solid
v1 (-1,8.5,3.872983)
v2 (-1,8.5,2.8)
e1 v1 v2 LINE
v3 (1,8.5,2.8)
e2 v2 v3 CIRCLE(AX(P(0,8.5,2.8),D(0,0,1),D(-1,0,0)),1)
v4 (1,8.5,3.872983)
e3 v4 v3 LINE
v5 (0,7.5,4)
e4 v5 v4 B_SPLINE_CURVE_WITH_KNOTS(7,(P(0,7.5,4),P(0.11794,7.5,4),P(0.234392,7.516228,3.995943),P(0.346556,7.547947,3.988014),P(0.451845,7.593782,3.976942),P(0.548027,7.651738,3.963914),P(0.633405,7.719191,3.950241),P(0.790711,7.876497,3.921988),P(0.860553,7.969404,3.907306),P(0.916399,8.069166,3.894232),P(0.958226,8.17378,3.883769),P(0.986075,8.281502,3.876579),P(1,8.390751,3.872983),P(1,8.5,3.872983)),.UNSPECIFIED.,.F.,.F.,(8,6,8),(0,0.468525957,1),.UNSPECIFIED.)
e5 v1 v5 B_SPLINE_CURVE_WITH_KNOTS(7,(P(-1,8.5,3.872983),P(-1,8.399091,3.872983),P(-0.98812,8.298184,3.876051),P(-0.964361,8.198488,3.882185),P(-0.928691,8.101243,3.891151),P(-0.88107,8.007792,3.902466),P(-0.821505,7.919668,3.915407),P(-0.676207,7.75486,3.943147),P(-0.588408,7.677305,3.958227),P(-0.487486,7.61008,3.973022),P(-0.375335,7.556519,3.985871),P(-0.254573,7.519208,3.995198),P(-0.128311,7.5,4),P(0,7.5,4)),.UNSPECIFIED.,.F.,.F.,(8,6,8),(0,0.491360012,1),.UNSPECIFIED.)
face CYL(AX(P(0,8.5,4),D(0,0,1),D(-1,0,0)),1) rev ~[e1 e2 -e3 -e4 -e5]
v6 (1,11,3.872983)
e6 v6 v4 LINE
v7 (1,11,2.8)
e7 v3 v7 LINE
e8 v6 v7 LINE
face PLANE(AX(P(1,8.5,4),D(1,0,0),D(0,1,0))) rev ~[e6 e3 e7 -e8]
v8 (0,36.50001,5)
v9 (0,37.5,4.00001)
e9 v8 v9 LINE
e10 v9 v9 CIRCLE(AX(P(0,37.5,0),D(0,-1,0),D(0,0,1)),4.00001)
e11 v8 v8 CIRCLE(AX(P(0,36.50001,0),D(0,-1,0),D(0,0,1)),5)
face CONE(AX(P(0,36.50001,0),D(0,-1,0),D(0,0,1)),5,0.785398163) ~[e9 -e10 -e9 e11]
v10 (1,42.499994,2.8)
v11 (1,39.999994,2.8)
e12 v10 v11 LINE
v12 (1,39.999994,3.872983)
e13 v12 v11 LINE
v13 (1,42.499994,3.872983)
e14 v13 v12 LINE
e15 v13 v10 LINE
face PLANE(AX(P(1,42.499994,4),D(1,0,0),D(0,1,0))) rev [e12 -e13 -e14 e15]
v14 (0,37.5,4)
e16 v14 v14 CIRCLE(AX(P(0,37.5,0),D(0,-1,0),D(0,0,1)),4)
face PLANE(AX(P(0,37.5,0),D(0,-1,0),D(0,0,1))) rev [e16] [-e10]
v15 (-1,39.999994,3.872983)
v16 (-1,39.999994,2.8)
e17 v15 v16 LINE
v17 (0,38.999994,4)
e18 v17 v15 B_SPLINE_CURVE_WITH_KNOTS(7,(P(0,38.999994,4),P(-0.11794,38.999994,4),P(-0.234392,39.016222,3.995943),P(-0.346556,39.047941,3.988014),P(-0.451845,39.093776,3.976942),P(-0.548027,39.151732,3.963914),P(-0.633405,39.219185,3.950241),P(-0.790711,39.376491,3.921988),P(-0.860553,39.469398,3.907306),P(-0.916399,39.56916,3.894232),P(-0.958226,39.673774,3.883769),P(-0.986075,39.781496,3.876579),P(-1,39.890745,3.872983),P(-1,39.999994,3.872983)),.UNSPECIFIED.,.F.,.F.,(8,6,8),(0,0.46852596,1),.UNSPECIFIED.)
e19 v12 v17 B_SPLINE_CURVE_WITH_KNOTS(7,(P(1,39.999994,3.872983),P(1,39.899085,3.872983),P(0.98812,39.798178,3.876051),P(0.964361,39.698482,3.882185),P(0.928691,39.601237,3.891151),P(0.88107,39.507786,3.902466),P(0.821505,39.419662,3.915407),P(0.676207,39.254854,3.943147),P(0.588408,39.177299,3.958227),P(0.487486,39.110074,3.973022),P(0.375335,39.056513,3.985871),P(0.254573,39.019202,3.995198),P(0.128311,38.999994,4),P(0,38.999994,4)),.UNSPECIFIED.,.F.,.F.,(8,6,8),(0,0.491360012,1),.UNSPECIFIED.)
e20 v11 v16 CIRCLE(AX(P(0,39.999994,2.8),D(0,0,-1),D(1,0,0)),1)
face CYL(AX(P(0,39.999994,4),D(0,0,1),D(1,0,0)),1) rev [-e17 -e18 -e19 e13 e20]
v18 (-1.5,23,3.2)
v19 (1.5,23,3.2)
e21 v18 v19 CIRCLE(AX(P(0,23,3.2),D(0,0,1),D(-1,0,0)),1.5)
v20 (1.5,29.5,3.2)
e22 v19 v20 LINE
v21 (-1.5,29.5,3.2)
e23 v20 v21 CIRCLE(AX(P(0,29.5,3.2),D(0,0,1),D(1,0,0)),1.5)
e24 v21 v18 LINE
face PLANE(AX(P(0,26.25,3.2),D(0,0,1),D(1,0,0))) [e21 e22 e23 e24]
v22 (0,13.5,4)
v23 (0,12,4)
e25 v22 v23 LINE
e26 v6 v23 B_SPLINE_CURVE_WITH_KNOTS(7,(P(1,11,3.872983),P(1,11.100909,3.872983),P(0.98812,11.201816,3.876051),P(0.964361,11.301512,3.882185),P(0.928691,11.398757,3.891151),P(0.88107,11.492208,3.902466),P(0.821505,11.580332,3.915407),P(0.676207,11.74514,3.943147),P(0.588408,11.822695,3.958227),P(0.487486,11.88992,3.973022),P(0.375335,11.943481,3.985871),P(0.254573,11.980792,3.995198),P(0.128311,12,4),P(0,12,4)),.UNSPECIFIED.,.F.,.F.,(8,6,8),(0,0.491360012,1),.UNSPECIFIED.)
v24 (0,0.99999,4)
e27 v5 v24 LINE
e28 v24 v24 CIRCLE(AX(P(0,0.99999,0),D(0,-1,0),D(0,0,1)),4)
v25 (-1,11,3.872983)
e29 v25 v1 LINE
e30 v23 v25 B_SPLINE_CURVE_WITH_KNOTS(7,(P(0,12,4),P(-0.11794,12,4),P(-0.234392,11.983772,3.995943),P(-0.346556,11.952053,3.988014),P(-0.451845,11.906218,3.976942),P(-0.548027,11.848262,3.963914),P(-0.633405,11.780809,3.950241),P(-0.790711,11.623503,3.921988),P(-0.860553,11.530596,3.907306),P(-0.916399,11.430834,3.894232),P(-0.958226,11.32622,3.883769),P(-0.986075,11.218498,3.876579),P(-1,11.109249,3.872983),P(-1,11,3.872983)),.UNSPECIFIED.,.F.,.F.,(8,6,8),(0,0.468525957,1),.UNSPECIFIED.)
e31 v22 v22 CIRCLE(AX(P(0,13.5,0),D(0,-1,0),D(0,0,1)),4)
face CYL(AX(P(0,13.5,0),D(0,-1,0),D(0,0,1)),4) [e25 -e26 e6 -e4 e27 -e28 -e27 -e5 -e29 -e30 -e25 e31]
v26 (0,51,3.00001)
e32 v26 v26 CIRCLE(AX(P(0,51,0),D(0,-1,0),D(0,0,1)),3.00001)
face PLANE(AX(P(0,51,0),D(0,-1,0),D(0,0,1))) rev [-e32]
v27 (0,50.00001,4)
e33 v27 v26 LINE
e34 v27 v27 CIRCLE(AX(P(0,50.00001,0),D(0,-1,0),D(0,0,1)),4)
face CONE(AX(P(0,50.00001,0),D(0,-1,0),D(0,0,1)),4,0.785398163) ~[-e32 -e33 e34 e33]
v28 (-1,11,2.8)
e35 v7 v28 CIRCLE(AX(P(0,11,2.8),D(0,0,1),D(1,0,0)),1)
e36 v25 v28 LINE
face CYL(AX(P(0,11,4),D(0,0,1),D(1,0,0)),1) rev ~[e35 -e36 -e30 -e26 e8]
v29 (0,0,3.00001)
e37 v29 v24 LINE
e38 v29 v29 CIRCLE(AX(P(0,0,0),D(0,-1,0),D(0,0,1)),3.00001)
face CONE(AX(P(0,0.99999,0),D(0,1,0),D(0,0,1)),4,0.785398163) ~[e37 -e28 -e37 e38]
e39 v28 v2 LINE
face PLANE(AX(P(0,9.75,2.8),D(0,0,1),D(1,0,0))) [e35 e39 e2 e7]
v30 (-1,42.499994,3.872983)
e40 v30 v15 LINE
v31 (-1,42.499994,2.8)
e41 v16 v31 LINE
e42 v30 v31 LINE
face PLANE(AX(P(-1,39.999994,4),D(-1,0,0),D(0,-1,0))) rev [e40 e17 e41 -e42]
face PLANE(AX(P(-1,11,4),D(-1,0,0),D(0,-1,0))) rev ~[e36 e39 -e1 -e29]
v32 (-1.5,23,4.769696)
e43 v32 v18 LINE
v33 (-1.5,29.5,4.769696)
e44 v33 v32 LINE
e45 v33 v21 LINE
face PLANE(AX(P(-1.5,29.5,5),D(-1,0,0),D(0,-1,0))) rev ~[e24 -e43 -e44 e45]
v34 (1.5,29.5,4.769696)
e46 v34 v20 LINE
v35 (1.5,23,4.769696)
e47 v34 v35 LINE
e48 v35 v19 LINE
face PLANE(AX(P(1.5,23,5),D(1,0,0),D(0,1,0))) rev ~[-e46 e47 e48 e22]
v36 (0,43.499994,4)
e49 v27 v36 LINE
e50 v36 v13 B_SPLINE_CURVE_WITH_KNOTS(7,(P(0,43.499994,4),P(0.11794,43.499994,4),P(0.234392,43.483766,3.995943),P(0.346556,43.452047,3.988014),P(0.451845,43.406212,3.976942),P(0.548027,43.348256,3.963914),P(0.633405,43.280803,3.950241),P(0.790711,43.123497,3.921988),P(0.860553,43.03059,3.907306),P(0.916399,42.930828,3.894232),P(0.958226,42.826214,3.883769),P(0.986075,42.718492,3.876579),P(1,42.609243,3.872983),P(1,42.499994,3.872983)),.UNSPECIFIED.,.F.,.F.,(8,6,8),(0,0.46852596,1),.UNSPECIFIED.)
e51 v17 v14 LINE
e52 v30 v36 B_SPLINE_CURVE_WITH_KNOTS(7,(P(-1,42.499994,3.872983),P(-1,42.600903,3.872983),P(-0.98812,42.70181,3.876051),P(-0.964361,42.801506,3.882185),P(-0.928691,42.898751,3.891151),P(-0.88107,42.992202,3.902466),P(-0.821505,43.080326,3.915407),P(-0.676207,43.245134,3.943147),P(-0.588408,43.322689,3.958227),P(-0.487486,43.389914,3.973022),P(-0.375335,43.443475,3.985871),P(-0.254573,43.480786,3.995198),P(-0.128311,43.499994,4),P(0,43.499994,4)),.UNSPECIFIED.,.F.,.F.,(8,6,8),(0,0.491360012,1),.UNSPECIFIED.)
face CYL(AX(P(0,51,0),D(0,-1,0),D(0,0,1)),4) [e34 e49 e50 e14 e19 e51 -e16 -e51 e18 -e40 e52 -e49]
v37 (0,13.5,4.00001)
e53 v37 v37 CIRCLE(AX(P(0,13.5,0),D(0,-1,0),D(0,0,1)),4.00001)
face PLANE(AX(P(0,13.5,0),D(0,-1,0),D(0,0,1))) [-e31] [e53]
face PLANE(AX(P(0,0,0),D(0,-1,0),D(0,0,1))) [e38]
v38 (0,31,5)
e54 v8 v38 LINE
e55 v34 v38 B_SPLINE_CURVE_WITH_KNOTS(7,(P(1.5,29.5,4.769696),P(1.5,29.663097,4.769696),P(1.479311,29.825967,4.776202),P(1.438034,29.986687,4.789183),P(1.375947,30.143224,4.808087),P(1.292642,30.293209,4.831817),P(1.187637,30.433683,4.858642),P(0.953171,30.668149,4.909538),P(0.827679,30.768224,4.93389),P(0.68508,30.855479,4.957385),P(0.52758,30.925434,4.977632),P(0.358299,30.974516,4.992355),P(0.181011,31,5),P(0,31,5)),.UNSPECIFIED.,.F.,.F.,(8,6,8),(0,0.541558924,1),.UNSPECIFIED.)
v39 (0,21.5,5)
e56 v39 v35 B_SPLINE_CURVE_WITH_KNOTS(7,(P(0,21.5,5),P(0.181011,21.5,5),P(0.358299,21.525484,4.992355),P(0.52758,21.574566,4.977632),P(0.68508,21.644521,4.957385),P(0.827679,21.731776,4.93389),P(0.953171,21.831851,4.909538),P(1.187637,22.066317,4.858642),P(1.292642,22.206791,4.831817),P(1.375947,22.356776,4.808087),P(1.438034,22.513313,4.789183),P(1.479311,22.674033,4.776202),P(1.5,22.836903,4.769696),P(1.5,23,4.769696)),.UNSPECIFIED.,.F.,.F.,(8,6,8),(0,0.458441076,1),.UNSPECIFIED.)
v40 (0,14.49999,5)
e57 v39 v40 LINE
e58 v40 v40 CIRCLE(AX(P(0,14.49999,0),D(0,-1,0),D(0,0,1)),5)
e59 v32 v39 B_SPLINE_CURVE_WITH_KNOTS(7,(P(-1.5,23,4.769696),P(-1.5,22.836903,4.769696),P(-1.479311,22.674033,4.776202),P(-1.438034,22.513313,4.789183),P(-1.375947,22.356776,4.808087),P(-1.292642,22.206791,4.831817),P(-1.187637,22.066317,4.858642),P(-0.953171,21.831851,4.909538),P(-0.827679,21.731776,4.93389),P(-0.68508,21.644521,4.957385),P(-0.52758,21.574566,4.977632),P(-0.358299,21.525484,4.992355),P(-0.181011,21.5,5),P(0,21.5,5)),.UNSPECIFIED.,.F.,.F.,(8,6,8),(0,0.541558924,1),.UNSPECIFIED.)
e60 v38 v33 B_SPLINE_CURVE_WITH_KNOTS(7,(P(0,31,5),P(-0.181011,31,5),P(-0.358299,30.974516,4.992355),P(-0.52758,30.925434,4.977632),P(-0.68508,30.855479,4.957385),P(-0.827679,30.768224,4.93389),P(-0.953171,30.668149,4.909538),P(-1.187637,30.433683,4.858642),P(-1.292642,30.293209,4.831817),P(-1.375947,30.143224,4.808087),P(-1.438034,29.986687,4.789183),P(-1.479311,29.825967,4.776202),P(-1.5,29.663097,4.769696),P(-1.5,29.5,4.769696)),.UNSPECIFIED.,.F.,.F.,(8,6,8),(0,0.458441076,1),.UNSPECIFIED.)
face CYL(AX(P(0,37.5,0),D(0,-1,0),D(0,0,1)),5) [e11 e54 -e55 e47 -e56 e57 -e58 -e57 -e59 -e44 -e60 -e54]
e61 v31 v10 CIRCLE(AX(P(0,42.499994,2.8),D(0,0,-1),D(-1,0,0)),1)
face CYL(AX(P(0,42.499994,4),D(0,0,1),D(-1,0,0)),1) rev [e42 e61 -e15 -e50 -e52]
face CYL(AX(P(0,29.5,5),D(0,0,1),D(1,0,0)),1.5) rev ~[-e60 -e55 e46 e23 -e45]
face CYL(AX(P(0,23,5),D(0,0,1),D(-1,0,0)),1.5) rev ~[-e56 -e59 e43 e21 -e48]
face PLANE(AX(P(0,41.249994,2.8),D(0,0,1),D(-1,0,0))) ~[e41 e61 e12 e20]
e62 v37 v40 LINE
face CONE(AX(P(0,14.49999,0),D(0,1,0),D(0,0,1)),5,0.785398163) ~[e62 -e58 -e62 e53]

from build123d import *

# Parameters (mm, degrees)
F6_DEPTH  = 1.2
F7_SIZE   = 0.99999
F11_DEPTH = 1.8


# Not quite as in the source:
# - a fillet or chamfer is up to 0.001 mm smaller than in the source, because OpenCascade refuses the exact size
# - a pattern or mirror of a feature is missing from the dataset's text; its kind, count and spacing are read off the source's solid


with BuildPart() as f1:
    # F0 (on Right) → F1 (revolve)
    with BuildSketch(Plane.YZ):
        Polygon((0, 4), (0, 0), (51, 0), (51, 4), (37.5, 4), (37.5, 5), (13.5, 5), (13.5, 4), align=None)
    revolve(axis=Axis((0, 25.5, 0), (0, -1, 0)))

    # F5 (on offset) → F6 (cut)
    with BuildSketch(Plane.XY.offset(4)):
        with BuildLine():
            Line((1, 8.5), (1, 11))
            ThreePointArc((1, 11), (0, 12), (-1, 11))
            Line((-1, 11), (-1, 8.5))
            ThreePointArc((-1, 8.5), (0, 7.5), (1, 8.5))
        make_face()
    f6 = extrude(amount=-F6_DEPTH, mode=Mode.SUBTRACT)

    # F6_copies: F6 across plane
    add(f6.mirror(Plane(origin=(-1e-06, 25.499997, -1e-06), x_dir=(0, 0, 1), z_dir=(0, 1, 0))), mode=Mode.SUBTRACT)

    # F7 (size 1 in the source; OpenCascade refuses exactly that, so slightly less here)
    f7_edges = [f1.edges().sort_by_distance(p)[0] for p in [
        (0, 13.5, -5),
        (0, 37.5, -5),
        (0, 51, -4),
        (0, 0, -4),
    ]]
    chamfer(f7_edges, length=F7_SIZE)

    # F10 (on offset) → F11 (cut)
    with BuildSketch(Plane.XY.offset(5)):
        with BuildLine():
            Line((1.5, 23), (1.5, 29.5))
            ThreePointArc((1.5, 29.5), (0, 31), (-1.5, 29.5))
            Line((-1.5, 29.5), (-1.5, 23))
            ThreePointArc((-1.5, 23), (0, 21.5), (1.5, 23))
        make_face()
    extrude(amount=-F11_DEPTH, mode=Mode.SUBTRACT)


solid = f1.part
